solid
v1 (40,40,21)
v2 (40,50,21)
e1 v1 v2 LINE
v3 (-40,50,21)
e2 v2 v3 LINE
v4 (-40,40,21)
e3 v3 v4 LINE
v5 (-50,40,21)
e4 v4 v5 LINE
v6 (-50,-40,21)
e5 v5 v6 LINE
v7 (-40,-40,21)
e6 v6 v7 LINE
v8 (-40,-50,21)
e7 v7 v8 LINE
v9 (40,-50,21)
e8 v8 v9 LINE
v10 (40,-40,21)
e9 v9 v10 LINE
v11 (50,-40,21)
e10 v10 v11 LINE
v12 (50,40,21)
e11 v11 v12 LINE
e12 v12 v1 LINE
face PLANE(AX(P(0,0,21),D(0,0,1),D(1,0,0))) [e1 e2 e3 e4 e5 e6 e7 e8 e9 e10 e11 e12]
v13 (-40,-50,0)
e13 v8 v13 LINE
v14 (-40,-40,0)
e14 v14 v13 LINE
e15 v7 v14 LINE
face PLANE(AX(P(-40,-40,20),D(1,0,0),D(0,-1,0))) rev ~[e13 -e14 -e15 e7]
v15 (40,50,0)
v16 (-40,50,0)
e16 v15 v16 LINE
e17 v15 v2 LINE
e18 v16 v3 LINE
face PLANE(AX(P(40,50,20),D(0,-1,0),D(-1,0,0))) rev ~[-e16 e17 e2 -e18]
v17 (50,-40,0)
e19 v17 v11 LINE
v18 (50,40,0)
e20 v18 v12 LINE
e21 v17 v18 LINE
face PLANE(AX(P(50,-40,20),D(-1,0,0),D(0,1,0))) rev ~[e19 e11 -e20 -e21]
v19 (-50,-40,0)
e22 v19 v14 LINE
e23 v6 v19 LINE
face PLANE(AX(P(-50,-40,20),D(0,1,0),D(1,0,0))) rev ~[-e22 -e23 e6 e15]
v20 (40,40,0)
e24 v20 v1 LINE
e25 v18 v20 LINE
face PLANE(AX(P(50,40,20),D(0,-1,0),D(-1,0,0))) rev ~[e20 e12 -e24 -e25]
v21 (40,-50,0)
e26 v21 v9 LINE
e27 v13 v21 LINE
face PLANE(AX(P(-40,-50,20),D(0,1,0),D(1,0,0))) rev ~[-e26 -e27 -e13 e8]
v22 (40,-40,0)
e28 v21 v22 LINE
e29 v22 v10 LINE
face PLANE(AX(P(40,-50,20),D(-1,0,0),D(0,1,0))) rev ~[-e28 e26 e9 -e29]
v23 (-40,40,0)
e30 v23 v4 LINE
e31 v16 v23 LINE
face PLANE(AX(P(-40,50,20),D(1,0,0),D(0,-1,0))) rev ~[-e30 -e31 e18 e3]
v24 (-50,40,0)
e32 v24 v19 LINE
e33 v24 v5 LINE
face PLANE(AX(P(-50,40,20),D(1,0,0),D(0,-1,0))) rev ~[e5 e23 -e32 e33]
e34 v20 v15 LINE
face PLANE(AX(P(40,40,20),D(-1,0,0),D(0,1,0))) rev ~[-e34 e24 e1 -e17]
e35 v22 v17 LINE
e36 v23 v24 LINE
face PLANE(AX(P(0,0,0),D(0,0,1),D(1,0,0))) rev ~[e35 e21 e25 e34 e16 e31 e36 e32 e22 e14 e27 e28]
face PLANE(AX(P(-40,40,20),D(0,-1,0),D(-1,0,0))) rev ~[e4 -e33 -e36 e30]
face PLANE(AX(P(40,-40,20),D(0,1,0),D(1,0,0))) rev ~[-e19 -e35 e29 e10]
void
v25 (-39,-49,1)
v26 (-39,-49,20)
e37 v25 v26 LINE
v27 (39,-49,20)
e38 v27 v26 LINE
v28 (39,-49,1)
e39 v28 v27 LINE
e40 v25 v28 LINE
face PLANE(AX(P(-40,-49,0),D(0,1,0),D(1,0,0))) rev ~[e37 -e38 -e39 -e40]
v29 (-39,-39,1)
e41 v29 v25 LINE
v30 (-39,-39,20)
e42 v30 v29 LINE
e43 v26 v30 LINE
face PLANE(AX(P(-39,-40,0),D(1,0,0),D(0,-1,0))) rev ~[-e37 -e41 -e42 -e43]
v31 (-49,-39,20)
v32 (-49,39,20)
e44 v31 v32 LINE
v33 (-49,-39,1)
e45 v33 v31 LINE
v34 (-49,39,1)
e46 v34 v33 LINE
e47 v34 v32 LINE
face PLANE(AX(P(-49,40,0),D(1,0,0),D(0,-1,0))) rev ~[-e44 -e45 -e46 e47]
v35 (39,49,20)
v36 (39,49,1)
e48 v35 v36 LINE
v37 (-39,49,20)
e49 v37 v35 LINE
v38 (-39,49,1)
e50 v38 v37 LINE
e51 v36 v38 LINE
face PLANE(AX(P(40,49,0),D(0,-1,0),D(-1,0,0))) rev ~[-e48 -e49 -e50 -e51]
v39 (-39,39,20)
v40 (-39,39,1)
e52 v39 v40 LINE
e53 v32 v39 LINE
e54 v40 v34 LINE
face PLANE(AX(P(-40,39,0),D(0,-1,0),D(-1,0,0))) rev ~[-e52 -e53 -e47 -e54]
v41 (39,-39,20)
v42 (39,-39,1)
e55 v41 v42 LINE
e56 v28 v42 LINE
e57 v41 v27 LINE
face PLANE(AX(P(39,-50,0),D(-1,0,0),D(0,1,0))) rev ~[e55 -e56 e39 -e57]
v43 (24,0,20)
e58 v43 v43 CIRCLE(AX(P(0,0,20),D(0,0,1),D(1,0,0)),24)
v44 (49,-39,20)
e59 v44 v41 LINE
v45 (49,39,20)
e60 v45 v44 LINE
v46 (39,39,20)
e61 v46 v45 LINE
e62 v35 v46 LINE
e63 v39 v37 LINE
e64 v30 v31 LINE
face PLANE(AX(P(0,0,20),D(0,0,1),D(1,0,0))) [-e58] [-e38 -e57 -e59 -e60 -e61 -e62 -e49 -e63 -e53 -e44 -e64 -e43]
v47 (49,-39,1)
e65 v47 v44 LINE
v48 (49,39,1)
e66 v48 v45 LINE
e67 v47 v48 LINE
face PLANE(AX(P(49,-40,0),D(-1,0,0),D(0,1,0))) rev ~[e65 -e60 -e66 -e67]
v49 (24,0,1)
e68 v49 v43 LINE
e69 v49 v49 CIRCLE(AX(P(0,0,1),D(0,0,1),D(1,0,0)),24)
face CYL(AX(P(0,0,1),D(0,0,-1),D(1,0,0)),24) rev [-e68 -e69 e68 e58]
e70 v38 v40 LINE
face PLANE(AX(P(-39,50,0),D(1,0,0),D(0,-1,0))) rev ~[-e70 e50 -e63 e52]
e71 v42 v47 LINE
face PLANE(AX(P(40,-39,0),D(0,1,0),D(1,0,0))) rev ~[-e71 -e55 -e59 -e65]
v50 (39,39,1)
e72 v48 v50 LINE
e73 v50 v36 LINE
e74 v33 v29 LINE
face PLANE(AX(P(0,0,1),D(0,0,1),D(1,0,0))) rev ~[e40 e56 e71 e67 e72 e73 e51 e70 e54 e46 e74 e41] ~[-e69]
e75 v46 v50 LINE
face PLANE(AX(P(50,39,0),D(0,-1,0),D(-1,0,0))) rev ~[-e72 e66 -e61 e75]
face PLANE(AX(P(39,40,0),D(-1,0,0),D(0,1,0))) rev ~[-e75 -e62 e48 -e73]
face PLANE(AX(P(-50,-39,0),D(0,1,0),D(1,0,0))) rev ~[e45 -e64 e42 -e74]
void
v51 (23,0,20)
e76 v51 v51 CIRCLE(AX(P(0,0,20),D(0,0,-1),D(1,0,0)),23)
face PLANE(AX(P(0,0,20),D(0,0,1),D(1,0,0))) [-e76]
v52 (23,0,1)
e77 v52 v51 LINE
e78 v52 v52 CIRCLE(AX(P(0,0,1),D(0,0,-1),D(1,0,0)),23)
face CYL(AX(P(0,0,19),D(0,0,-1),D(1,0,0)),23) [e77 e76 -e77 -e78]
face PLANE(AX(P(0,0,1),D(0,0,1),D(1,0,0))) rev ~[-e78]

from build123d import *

# Parameters (mm, degrees)
F1_DEPTH = 20
F2_T     = -1
F3_R     = 24
F4_DEPTH = 19
F5_T     = -1
F7_DEPTH = 1


# Not quite as in the source:
# - a shell that OpenCascade refuses in one call is made with other operations: the cavity is built on its own and cut out


with BuildPart() as f1:
    # F0 (on Top) → F1 (new body)
    with BuildSketch(Plane.XY):
        Polygon((40, 50), (-40, 50), (-40, 40), (-50, 40), (-50, -40), (-40, -40), (-40, -50), (40, -50), (40, -40), (50, -40), (50, 40), (40, 40), align=None)
    extrude(amount=F1_DEPTH)

    # F2
    f2_openings = [f1.faces().sort_by_distance(p)[0] for p in [
        (0, 0, 20),
    ]]
    offset(amount=F2_T, openings=f2_openings, kind=Kind.INTERSECTION)

    # F3 (on face) → F4 (join)
    with BuildSketch(Plane.XY.offset(1)):
        Circle(F3_R)
    extrude(amount=F4_DEPTH)

    # F5: a shell. OpenCascade refuses it in one call, so the cavity is built on its own and cut out:
    # the body offset inwards by the wall thickness, plus a prism from it out through each open face.
    f5_core = offset(f1.part, amount=F5_T, kind=Kind.INTERSECTION, mode=Mode.PRIVATE)
    f5_exits = [f5_core.faces().sort_by_distance(p)[0] for p in [
        (0, 0, 19),
    ]]
    add(f5_core, mode=Mode.SUBTRACT)
    extrude(f5_exits, amount=-F5_T, mode=Mode.SUBTRACT)

    # F6 (on face) → F7 (join)
    with BuildSketch(Plane.XY.offset(20)):
        Polygon((-40, -50), (40, -50), (40, -40), (50, -40), (50, 40), (40, 40), (40, 50), (-40, 50), (-40, 40), (-50, 40), (-50, -40), (-40, -40), align=None)
    extrude(amount=F7_DEPTH)


solid = f1.part
